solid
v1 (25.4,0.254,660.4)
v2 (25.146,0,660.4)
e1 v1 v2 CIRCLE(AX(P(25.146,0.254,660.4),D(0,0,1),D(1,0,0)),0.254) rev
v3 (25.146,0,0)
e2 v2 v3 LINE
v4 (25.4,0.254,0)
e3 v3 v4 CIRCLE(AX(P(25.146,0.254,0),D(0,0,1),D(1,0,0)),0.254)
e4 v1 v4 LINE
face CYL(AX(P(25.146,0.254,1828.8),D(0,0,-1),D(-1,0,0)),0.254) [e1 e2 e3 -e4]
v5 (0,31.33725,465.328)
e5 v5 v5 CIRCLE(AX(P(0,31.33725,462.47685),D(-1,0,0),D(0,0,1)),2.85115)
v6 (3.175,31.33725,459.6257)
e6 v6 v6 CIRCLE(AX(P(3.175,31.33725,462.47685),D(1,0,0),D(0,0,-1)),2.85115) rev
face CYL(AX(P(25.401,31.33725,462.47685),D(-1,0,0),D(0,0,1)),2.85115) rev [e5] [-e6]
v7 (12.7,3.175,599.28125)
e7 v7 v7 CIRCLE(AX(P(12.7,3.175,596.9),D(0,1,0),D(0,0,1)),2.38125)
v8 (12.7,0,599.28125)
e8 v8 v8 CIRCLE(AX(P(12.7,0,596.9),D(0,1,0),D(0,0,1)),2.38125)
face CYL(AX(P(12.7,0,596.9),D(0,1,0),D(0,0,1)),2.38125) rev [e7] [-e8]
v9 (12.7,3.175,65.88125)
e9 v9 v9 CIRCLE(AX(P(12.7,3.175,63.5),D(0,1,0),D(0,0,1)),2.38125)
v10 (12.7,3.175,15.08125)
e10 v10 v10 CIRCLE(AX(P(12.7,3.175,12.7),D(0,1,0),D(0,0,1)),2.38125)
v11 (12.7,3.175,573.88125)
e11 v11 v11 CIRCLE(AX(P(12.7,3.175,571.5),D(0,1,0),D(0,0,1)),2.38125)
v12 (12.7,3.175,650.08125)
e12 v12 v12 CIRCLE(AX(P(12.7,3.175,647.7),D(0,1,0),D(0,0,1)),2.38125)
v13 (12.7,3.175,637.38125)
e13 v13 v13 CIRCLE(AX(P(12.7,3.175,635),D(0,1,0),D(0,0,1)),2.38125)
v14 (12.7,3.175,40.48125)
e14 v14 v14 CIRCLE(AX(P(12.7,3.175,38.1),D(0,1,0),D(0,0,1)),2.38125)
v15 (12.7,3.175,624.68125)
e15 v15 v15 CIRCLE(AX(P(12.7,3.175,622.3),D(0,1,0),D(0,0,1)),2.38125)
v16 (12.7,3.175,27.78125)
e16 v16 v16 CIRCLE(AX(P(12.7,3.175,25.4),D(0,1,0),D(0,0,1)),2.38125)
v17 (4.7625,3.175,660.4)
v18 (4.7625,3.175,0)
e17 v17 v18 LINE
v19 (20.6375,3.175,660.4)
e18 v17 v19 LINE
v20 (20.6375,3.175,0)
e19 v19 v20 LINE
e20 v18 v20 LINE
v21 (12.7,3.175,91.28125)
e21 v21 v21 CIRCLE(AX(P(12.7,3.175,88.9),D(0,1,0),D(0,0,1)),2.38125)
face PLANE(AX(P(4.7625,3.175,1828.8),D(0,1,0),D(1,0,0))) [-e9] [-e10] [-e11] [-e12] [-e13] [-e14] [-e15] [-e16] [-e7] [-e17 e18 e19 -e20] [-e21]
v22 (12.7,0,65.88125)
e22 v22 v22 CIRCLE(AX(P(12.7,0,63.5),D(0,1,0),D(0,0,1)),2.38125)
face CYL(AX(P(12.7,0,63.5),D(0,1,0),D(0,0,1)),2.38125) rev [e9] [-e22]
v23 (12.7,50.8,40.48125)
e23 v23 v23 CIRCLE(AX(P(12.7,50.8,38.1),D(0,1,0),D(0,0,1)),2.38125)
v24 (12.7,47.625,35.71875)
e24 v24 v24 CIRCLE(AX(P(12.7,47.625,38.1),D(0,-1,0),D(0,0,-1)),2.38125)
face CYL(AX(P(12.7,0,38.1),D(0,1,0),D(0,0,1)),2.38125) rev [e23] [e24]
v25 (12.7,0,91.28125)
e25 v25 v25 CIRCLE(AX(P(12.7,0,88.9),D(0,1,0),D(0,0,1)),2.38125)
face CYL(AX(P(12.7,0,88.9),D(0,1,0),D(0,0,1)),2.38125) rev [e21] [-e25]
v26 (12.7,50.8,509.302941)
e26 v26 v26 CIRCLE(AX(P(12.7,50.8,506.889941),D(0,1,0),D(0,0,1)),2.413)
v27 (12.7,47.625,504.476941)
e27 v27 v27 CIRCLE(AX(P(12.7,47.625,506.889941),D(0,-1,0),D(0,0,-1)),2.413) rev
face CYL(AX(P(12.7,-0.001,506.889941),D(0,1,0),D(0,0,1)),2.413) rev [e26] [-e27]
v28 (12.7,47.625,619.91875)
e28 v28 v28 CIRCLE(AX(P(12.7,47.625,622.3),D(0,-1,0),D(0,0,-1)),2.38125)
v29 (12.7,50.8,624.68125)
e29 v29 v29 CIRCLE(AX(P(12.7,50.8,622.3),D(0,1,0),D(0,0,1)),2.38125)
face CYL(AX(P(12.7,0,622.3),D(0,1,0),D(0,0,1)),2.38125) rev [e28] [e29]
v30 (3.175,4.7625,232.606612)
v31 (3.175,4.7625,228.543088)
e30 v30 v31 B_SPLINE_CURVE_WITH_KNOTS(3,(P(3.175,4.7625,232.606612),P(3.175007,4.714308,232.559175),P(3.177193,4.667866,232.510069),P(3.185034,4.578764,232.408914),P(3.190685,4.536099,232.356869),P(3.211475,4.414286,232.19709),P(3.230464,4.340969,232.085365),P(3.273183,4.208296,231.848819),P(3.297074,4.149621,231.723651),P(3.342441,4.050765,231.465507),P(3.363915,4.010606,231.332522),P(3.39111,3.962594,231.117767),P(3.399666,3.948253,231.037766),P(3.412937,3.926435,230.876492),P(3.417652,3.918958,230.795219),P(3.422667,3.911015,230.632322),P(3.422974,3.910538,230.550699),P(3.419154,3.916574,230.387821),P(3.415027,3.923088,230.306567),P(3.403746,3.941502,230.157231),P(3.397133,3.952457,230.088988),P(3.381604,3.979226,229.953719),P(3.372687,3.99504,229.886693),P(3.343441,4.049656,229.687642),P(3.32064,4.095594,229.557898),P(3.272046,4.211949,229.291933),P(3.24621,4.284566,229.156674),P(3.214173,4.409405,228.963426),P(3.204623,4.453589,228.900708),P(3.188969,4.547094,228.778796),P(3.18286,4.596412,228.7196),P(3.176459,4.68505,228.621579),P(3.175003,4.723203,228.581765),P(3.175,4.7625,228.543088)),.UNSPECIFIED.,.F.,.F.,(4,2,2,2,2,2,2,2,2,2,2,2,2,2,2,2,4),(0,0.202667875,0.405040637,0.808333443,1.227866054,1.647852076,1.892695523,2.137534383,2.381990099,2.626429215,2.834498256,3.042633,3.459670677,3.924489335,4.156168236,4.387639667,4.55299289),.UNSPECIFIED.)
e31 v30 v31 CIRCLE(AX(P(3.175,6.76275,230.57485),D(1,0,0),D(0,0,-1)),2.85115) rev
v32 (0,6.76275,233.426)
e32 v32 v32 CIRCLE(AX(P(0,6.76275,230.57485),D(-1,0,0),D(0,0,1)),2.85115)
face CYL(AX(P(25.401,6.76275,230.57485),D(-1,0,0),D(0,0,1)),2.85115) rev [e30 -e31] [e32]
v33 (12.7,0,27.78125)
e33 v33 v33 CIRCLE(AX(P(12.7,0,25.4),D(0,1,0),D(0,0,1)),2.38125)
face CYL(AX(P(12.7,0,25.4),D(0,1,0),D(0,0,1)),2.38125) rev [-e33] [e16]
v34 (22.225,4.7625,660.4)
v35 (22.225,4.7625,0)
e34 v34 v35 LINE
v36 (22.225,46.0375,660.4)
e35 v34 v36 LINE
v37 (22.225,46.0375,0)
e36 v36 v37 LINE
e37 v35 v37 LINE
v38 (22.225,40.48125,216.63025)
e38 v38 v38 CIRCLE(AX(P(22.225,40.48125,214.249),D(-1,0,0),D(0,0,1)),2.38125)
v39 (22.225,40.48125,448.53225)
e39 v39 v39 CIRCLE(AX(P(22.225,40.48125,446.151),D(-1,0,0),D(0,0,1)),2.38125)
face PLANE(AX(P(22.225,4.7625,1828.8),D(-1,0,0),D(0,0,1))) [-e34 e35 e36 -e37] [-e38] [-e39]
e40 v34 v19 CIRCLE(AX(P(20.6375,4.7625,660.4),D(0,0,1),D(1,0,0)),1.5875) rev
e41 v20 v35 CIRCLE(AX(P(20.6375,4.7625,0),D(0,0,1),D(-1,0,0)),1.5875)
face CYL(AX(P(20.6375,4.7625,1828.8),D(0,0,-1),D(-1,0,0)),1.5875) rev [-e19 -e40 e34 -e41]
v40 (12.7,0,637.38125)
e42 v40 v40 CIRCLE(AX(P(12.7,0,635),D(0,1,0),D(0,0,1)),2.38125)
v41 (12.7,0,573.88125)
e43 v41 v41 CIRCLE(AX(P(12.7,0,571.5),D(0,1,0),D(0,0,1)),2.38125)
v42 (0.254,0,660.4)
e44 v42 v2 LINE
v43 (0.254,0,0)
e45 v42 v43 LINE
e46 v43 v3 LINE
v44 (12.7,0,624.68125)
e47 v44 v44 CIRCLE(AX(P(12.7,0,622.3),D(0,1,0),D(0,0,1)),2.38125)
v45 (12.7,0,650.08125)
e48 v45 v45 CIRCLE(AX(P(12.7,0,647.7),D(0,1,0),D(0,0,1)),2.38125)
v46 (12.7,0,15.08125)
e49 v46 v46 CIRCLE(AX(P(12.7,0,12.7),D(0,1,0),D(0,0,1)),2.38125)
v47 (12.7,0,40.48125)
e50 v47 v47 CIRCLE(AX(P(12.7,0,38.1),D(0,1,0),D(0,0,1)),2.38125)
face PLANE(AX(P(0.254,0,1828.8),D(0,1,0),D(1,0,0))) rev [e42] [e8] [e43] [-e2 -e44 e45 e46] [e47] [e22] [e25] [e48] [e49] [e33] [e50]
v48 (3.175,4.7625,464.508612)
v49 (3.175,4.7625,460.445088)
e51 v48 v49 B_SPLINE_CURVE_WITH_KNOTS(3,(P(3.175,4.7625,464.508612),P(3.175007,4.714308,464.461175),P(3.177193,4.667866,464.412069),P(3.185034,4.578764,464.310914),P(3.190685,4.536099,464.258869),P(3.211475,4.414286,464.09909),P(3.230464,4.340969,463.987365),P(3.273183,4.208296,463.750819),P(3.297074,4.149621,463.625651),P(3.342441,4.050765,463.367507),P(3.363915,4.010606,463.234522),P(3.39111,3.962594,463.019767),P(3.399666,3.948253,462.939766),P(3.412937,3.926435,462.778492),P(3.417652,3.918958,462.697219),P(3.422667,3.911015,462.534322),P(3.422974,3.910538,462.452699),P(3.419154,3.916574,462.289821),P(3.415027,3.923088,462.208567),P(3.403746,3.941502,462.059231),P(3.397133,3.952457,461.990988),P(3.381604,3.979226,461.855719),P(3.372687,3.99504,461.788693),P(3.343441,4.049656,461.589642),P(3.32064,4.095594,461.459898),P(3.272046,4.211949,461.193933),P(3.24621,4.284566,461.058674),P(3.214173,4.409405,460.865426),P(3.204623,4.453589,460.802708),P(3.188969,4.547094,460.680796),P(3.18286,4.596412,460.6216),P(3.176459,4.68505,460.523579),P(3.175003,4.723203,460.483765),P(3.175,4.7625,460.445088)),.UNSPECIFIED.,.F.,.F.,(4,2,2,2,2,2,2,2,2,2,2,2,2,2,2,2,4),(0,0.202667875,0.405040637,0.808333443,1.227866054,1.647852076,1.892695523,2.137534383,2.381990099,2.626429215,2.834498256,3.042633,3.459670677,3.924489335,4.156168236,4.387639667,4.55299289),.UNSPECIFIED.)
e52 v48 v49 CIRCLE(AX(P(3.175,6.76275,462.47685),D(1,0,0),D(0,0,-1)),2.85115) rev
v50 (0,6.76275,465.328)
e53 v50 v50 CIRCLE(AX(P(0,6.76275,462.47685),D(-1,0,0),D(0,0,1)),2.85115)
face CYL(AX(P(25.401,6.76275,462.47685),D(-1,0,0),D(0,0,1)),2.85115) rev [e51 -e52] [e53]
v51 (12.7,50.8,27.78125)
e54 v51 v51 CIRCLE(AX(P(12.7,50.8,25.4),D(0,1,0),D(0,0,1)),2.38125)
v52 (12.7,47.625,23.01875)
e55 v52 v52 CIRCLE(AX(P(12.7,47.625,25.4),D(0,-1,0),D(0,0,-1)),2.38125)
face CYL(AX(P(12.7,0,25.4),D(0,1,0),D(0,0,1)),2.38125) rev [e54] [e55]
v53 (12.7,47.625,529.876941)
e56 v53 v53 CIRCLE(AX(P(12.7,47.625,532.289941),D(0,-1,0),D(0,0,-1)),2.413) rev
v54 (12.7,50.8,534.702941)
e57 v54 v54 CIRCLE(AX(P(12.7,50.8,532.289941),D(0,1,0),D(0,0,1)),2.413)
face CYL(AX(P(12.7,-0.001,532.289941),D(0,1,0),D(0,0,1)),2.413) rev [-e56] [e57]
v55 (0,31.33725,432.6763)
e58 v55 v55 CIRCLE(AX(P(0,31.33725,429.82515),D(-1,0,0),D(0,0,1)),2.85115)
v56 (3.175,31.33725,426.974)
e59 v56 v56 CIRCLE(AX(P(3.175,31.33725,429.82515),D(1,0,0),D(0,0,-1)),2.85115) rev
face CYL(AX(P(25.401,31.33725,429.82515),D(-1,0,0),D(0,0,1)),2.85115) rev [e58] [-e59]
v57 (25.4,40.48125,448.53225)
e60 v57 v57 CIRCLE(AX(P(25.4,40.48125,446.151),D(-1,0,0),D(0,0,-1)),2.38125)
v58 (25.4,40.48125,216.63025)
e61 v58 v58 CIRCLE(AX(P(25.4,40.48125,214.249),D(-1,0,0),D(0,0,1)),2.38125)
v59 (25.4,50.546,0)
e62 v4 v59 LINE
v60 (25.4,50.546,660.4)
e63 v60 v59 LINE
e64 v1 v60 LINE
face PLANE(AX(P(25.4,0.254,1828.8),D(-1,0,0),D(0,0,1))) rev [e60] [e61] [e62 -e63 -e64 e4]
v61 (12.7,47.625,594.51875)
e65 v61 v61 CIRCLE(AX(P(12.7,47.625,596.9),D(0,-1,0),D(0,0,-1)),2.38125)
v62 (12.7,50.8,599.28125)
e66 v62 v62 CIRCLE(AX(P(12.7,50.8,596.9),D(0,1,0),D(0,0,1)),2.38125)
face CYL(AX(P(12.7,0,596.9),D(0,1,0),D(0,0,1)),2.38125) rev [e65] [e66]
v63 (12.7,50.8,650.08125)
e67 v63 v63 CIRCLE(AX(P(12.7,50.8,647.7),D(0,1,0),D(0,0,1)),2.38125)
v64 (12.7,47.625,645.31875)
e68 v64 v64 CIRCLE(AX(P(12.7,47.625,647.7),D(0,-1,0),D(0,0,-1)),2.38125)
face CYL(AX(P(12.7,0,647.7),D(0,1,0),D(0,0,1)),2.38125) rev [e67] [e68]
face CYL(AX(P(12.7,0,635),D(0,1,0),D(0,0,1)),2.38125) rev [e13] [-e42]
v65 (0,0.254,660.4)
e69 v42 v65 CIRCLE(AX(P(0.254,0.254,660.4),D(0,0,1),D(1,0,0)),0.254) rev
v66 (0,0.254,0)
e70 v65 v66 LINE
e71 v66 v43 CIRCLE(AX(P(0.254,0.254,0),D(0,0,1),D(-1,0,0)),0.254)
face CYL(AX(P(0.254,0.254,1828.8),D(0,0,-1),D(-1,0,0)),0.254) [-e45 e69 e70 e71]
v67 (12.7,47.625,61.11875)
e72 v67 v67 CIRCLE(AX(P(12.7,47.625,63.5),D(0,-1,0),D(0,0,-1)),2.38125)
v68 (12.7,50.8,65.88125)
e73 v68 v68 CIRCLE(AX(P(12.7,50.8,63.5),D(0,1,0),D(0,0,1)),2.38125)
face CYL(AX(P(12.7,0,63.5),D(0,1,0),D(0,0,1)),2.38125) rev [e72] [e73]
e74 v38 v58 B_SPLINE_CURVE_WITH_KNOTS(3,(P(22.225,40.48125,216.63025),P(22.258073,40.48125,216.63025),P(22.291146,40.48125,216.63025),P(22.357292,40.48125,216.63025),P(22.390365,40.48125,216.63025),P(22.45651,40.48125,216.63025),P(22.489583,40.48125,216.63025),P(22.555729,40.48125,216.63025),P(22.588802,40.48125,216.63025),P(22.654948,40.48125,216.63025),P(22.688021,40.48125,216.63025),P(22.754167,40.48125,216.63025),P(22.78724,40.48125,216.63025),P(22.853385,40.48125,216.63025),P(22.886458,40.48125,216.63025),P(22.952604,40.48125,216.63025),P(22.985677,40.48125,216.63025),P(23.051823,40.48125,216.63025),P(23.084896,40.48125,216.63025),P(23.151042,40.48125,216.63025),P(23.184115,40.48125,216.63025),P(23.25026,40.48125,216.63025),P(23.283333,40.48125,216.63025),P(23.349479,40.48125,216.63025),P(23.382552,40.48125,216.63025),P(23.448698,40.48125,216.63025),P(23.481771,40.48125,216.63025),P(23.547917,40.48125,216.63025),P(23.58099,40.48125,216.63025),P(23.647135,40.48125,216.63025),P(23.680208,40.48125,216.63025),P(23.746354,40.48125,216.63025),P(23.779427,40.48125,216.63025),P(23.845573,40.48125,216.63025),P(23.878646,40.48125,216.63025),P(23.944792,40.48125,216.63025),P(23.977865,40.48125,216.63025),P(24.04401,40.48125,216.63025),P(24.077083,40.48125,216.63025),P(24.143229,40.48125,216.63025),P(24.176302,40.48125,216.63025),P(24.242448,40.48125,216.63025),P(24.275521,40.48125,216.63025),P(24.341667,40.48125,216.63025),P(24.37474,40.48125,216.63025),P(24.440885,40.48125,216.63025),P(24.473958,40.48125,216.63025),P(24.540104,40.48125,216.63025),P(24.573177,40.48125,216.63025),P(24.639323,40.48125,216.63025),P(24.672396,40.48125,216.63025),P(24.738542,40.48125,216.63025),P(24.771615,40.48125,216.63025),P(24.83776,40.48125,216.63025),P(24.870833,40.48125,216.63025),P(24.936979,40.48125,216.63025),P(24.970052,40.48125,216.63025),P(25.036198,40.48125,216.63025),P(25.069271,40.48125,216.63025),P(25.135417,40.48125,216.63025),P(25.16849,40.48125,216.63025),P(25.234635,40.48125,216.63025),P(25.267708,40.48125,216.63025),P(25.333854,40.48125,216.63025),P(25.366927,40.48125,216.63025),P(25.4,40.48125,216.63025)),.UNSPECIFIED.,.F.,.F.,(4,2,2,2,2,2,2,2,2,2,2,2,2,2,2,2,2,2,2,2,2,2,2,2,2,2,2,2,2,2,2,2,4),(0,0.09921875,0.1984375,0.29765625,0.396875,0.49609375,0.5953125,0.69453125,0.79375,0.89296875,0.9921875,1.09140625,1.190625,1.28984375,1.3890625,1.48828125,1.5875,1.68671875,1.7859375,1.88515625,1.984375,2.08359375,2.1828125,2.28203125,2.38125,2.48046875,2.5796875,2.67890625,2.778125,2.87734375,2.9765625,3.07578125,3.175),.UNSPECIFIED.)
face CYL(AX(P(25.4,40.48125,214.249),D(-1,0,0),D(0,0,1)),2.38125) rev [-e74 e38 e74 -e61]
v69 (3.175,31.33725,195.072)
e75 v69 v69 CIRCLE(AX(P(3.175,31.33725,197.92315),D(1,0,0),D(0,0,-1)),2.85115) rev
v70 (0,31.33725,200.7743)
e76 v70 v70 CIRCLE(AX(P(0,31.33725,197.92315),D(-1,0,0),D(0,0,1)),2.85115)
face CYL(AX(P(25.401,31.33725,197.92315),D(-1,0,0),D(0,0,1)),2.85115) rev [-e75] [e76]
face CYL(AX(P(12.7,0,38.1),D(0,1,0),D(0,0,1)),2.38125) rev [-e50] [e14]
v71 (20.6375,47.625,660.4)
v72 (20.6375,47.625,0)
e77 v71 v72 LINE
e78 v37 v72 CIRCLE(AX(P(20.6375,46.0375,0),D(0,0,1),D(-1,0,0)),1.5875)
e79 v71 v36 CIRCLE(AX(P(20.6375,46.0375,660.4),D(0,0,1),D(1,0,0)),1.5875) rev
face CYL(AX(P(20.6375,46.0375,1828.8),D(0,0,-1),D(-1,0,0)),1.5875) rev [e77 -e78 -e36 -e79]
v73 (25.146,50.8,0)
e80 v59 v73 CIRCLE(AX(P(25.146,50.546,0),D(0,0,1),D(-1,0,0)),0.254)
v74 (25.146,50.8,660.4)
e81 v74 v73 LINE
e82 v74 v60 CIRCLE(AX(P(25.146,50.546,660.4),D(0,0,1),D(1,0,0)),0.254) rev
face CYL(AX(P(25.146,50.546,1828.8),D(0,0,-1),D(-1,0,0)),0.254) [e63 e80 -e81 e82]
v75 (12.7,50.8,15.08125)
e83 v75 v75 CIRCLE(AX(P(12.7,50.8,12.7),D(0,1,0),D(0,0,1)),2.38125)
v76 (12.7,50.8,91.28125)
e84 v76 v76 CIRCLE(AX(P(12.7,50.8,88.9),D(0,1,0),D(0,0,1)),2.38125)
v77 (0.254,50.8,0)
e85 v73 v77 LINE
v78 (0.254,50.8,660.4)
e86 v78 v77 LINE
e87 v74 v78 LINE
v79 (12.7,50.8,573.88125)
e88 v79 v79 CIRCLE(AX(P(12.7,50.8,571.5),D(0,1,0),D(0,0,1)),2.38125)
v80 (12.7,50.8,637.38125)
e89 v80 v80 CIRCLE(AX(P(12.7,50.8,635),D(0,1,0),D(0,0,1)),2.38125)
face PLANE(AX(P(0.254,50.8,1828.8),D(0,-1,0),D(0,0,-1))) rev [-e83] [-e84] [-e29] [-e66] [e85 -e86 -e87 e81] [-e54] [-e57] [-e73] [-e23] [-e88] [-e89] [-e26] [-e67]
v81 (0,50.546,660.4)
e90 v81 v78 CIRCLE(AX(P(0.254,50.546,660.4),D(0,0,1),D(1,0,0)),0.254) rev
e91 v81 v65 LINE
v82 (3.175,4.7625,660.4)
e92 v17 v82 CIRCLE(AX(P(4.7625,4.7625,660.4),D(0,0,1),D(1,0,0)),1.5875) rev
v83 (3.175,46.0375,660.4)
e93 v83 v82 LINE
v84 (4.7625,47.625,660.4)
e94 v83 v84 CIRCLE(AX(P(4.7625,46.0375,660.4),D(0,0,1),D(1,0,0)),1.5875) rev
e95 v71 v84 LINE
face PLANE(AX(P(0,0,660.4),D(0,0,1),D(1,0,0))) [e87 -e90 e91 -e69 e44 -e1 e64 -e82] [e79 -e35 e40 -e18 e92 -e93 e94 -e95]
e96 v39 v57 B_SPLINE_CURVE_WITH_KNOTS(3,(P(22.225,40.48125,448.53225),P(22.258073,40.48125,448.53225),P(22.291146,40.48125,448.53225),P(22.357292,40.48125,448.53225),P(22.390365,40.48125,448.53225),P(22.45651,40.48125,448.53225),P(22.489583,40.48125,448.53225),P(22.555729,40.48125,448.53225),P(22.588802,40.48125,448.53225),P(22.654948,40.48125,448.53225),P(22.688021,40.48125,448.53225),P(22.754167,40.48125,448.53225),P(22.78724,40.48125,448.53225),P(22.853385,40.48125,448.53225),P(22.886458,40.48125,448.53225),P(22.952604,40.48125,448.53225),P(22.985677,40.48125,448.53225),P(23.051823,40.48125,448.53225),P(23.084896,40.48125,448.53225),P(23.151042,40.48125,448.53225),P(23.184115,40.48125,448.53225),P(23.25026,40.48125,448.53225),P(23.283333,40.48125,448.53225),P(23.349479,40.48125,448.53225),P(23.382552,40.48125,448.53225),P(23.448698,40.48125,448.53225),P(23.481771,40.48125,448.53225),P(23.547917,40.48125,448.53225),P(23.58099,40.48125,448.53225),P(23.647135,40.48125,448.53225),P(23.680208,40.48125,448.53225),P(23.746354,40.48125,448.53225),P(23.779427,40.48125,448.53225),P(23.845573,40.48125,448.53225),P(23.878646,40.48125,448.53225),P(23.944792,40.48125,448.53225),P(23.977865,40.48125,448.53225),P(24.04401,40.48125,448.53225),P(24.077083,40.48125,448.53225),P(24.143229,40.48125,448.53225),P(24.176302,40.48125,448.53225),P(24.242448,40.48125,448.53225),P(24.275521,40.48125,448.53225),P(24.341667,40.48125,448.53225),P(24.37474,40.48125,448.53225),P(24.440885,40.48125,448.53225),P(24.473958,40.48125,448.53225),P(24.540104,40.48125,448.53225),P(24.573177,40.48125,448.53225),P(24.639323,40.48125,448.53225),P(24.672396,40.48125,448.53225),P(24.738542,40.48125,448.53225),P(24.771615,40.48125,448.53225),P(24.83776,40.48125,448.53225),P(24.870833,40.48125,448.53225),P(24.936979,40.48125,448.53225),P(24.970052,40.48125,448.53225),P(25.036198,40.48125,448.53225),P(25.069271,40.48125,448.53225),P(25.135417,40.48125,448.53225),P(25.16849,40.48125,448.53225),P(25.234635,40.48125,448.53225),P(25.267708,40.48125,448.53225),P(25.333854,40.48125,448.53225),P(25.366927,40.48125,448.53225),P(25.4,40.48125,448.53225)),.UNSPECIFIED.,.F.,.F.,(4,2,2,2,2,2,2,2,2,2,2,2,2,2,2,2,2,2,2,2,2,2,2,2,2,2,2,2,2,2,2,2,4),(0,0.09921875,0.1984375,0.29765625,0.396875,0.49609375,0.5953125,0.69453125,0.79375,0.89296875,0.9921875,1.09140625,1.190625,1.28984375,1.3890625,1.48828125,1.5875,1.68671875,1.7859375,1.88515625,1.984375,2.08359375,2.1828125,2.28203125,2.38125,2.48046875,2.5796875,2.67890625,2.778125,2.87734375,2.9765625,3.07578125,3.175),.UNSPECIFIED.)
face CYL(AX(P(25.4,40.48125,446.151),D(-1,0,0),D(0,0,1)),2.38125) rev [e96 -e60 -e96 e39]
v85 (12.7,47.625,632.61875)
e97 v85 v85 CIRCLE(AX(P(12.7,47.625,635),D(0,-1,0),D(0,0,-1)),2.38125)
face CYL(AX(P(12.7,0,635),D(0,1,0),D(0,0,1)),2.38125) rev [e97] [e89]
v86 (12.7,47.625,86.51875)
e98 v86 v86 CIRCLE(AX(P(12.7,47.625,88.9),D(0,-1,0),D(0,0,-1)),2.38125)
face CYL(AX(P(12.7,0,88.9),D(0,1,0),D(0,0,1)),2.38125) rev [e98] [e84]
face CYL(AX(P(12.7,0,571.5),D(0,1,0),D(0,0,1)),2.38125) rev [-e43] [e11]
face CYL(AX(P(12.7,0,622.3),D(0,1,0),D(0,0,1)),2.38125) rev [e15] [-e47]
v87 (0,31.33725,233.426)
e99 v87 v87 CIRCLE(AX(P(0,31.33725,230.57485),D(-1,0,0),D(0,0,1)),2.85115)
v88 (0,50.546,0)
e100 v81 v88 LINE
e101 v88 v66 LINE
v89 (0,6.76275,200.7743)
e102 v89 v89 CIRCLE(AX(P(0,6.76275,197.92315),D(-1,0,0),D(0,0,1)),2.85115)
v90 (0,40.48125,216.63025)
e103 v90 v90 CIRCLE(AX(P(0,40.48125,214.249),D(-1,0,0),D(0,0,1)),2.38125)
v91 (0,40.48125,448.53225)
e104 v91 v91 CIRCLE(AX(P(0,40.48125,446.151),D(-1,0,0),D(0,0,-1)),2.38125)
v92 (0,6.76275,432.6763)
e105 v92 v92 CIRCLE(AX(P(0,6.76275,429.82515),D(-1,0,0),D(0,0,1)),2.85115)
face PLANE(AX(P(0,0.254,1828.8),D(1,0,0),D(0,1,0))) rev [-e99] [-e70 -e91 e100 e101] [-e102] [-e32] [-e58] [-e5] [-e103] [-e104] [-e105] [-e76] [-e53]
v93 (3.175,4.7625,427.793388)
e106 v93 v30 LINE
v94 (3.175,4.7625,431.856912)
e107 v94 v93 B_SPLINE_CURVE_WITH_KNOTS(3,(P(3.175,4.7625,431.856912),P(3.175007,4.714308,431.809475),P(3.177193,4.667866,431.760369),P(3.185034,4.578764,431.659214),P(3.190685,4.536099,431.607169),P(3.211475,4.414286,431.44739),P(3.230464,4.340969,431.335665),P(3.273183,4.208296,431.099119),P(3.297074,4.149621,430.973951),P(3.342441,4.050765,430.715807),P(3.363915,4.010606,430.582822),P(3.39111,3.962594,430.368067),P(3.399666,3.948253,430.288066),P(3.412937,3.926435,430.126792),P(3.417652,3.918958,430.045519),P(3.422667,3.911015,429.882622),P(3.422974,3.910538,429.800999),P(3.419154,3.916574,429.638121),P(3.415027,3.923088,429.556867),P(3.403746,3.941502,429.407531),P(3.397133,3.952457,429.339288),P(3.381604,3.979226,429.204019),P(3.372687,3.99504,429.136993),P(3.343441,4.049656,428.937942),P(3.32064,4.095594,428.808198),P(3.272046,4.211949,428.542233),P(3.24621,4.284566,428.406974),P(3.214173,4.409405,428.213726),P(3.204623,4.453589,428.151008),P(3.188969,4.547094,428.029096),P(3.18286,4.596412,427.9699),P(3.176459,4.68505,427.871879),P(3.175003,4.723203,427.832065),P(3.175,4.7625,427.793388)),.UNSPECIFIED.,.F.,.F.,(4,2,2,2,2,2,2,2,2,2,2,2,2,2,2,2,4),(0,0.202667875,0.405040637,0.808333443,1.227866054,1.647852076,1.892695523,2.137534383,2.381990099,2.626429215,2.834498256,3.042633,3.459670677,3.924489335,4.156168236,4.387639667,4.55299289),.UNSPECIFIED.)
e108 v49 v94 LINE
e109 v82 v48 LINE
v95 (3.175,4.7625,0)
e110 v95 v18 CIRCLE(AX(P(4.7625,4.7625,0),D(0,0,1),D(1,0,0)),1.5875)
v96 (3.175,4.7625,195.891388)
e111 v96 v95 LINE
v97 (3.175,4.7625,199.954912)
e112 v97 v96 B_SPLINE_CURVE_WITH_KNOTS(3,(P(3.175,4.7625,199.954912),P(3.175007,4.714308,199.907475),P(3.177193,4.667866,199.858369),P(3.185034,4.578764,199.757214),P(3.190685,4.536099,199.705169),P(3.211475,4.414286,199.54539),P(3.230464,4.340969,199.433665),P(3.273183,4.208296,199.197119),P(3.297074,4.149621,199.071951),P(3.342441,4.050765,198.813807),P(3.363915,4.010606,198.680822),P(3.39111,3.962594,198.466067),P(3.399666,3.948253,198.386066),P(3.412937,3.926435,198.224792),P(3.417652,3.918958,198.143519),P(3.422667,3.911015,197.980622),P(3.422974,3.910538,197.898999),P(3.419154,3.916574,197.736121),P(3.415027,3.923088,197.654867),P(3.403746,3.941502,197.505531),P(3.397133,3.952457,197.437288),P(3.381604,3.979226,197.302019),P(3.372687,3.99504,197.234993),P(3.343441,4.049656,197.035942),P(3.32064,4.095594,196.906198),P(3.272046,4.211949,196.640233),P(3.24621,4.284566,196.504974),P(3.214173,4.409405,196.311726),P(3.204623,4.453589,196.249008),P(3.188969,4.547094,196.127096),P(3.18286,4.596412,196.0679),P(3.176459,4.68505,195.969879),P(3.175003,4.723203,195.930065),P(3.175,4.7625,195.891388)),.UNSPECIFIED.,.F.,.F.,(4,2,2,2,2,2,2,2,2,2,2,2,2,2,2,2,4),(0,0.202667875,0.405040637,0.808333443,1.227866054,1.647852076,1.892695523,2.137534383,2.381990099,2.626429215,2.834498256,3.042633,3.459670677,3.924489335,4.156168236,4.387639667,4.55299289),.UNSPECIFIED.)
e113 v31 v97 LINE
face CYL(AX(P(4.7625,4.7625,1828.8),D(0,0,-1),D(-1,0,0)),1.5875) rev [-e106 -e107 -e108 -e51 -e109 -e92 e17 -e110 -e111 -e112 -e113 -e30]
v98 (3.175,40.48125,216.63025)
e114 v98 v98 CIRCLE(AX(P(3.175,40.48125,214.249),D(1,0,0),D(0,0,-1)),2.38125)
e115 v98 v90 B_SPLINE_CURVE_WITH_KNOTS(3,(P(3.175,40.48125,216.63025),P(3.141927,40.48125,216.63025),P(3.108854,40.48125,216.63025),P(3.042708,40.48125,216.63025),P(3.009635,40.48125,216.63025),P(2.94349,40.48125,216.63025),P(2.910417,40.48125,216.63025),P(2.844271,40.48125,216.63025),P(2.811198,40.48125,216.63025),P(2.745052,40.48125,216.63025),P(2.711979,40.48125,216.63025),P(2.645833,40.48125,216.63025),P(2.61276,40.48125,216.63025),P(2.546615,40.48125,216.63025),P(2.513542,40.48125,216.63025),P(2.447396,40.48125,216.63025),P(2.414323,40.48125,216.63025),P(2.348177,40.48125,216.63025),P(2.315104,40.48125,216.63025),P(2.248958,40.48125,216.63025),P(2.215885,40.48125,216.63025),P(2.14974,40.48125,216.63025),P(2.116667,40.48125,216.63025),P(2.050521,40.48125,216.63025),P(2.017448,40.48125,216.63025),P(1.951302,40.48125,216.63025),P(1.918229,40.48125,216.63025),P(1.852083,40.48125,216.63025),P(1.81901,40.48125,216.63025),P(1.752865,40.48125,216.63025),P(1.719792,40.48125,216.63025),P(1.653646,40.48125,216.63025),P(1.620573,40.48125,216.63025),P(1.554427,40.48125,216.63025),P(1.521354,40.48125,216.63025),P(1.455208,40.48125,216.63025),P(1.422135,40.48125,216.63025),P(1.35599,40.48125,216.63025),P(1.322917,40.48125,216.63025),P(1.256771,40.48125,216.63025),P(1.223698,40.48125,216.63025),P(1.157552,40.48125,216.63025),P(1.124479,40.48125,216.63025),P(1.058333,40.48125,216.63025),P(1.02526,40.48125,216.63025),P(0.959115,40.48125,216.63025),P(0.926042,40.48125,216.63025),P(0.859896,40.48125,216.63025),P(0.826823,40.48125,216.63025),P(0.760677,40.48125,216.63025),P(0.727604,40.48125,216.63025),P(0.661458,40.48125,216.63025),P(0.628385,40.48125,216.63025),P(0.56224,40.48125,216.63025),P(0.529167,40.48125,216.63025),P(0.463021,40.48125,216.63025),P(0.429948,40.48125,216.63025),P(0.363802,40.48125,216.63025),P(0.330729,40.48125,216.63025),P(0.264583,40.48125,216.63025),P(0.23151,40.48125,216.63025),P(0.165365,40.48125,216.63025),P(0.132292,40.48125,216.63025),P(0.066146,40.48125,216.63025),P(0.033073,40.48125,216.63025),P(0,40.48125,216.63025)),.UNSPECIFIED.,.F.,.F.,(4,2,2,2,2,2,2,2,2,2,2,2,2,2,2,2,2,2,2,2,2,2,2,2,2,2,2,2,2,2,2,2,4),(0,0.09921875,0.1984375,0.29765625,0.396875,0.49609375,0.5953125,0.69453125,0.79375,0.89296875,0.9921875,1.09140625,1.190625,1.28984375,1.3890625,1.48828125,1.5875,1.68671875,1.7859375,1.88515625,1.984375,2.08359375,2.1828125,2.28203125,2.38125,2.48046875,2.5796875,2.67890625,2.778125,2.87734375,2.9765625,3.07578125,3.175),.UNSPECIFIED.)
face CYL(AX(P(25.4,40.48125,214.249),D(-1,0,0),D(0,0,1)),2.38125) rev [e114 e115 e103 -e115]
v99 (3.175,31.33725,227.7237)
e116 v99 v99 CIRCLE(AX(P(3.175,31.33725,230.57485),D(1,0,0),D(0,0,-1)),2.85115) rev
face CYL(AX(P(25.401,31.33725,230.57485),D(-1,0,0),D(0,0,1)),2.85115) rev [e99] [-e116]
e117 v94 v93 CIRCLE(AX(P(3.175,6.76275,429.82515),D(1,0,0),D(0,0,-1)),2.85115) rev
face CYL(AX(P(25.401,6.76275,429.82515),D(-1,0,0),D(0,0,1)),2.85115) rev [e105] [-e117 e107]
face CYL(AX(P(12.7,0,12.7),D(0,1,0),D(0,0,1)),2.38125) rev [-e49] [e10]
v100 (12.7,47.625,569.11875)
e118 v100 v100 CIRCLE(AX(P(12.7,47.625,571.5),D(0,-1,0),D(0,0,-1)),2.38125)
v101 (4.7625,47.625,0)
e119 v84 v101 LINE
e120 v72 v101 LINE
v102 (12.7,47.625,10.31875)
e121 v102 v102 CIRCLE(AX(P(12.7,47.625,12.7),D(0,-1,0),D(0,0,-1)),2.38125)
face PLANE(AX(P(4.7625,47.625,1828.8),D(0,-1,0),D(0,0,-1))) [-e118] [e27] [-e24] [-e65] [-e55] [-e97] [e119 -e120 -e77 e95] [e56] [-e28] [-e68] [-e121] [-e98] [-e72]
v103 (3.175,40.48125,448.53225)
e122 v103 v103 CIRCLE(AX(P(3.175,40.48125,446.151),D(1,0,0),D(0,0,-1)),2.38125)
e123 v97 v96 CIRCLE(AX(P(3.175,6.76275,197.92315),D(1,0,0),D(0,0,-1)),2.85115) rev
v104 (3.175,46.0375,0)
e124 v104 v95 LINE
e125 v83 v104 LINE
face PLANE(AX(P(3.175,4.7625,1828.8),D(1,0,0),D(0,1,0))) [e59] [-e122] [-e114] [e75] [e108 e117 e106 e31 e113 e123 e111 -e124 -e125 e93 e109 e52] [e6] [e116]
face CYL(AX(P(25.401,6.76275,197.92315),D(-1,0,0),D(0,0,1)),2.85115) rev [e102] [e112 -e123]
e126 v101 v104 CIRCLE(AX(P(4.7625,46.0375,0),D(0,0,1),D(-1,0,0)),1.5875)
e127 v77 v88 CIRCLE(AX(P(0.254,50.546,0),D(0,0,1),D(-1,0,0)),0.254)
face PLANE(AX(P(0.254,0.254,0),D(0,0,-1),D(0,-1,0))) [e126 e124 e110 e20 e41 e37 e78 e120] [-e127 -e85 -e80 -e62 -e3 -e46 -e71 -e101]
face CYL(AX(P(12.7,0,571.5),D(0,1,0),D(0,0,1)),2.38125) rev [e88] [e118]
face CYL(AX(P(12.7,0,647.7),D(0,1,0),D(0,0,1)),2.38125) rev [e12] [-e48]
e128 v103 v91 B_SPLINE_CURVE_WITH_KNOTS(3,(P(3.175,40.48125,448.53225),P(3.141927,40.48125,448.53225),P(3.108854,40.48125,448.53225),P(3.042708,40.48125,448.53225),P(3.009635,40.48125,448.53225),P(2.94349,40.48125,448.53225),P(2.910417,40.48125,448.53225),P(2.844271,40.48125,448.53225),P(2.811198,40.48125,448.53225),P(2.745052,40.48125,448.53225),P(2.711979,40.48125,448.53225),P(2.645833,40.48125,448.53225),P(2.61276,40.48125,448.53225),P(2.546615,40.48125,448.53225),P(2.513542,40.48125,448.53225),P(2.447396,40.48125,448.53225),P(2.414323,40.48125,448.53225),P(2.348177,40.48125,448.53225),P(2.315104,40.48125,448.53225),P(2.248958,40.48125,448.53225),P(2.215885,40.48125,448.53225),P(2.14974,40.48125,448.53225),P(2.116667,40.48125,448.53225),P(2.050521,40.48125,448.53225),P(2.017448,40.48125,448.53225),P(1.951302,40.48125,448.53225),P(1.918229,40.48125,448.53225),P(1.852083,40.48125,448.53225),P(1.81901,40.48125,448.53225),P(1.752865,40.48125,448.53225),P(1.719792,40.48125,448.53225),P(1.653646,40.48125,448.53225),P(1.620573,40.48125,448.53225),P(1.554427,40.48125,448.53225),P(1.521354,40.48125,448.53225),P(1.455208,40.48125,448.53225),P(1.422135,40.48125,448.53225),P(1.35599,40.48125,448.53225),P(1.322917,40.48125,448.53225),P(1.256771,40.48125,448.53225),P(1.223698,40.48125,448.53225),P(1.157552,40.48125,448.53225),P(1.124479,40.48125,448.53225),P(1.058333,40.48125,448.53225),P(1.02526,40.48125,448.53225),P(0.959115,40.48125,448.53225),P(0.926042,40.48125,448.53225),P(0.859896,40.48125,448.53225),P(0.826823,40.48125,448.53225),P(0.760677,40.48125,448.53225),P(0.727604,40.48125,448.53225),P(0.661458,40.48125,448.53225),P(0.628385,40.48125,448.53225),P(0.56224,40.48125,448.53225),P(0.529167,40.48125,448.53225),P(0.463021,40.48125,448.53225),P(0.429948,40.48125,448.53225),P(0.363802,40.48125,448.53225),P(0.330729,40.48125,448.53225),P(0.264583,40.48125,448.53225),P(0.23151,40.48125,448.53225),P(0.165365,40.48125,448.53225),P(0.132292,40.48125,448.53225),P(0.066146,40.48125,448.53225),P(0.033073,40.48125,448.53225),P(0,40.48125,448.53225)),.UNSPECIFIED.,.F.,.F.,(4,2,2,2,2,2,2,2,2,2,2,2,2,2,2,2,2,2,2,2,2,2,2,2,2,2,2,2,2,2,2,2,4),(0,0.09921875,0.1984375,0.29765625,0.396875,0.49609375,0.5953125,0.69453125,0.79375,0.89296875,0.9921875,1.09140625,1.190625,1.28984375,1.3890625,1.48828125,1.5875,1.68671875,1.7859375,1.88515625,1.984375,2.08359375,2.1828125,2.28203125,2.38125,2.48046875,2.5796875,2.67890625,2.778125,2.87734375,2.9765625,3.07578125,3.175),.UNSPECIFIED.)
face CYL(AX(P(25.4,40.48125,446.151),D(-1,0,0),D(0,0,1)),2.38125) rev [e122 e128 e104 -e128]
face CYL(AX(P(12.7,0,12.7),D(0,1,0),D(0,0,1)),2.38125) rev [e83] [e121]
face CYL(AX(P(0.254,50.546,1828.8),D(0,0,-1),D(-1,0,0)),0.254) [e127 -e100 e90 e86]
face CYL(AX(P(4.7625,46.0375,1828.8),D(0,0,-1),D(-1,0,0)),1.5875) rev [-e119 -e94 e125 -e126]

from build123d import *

# Parameters (mm, degrees)
CUT_EXTRUDE1_START = -1828.8
CUT_EXTRUDE1_DEPTH = 660.4
SKETCH3_R          = 2.38125
CUT_EXTRUDE3_DEPTH = 50.8
CUT_EXTRUDE4_REACH = 664.838
SKETCH4_R          = 2.413
CUT_EXTRUDE5_REACH = 664.838
SKETCH5_R          = 2.85115
SKETCH6_R          = 2.38125
CUT_EXTRUDE6_DEPTH = 663.837808315


with BuildPart() as part:
    # Cut-Extrude1: read off the stored shape, not the designer's step
    # Cut-Extrude1 outline → Cut-Extrude1 (new body)
    with BuildSketch(Plane.XY.offset(1828.8).offset(CUT_EXTRUDE1_START)):
        with BuildLine():
            Line((0, 50.546), (0, 0.254))
            ThreePointArc((0, 0.254), (0.074394878, 0.074394878), (0.254, 0))
            Line((0.254, 0), (25.146, 0))
            ThreePointArc((25.146, 0), (25.325605122, 0.074394878), (25.4, 0.254))
            Line((25.4, 0.254), (25.4, 50.546))
            ThreePointArc((25.4, 50.546), (25.325605122, 50.725605122), (25.146, 50.8))
            Line((25.146, 50.8), (0.254, 50.8))
            ThreePointArc((0.254, 50.8), (0.074394878, 50.725605122), (0, 50.546))
        make_face()
        with BuildLine():
            ThreePointArc((4.7625, 3.175), (3.639967985, 3.639967985), (3.175, 4.7625))
            Line((3.175, 4.7625), (3.175, 46.0375))
            ThreePointArc((3.175, 46.0375), (3.639967985, 47.160032015), (4.7625, 47.625))
            Line((4.7625, 47.625), (20.6375, 47.625))
            ThreePointArc((20.6375, 47.625), (21.760032015, 47.160032015), (22.225, 46.0375))
            Line((22.225, 46.0375), (22.225, 4.7625))
            ThreePointArc((22.225, 4.7625), (21.760032015, 3.639967985), (20.6375, 3.175))
            Line((20.6375, 3.175), (4.7625, 3.175))
        make_face(mode=Mode.SUBTRACT)
    extrude(amount=CUT_EXTRUDE1_DEPTH)

    # Sketch3 → Cut-Extrude3 (cut)
    with BuildSketch(Plane(origin=(0, 50.8, 0), x_dir=(1, 0, 0), z_dir=(0, 1, 0))):
        with Locations(Location((12.7, -25.4, 0), (0, 0, 270))):
            Circle(SKETCH3_R)
        with Locations(Location((12.7, -12.7, 0), (0, 0, 270))):
            Circle(SKETCH3_R)
        with Locations(Location((12.7, -38.1, 0), (0, 0, 270))):
            Circle(SKETCH3_R)
        with Locations(Location((12.7, -622.3, 0), (0, 0, 270))):
            Circle(SKETCH3_R)
        with Locations(Location((12.7, -635, 0), (0, 0, 270))):
            Circle(SKETCH3_R)
        with Locations(Location((12.7, -647.7, 0), (0, 0, 270))):
            Circle(SKETCH3_R)
        with Locations(Location((12.7, -63.5, 0), (0, 0, 270))):
            Circle(SKETCH3_R)
        with Locations(Location((12.7, -88.9, 0), (0, 0, 270))):
            Circle(SKETCH3_R)
        with Locations(Location((12.7, -596.9, 0), (0, 0, 270))):
            Circle(SKETCH3_R)
        with Locations(Location((12.7, -571.5, 0), (0, 0, 270))):
            Circle(SKETCH3_R)
    extrude(amount=-CUT_EXTRUDE3_DEPTH, mode=Mode.SUBTRACT)

    # Sketch4 → Cut-Extrude4 (cut, up to next)
    with BuildSketch(Plane(origin=(0, 50.8, 0), x_dir=(1, 0, 0), z_dir=(0, 1, 0)), mode=Mode.PRIVATE) as cut_extrude4_sk1:
        with Locations(Location((12.7, -532.289940881, 0), (0, 0, 270))):
            Circle(SKETCH4_R)
    cut_extrude4_tool1 = extrude(cut_extrude4_sk1.sketch, amount=-CUT_EXTRUDE4_REACH, mode=Mode.PRIVATE) & part.part
    # Sketch4 → Cut-Extrude4 (cut, up to next)
    with BuildSketch(Plane(origin=(0, 50.8, 0), x_dir=(1, 0, 0), z_dir=(0, 1, 0)), mode=Mode.PRIVATE) as cut_extrude4_sk2:
        with Locations(Location((12.7, -506.889940881, 0), (0, 0, 270))):
            Circle(SKETCH4_R)
    cut_extrude4_tool2 = extrude(cut_extrude4_sk2.sketch, amount=-CUT_EXTRUDE4_REACH, mode=Mode.PRIVATE) & part.part
    add(cut_extrude4_tool1.solids().sort_by_distance((12.7, 50.8, 532.289941))[0], mode=Mode.SUBTRACT)
    add(cut_extrude4_tool2.solids().sort_by_distance((12.7, 50.8, 506.889941))[0], mode=Mode.SUBTRACT)

    # Sketch5 → Cut-Extrude5 (cut, up to next)
    with BuildSketch(Plane.ZY, mode=Mode.PRIVATE) as cut_extrude5_sk1:
        with Locations((197.92315, 31.33725)):
            Circle(SKETCH5_R)
    cut_extrude5_tool1 = extrude(cut_extrude5_sk1.sketch, amount=-CUT_EXTRUDE5_REACH, mode=Mode.PRIVATE) & part.part
    # Sketch5 → Cut-Extrude5 (cut, up to next)
    with BuildSketch(Plane.ZY, mode=Mode.PRIVATE) as cut_extrude5_sk2:
        with Locations((230.57485, 31.33725)):
            Circle(SKETCH5_R)
    cut_extrude5_tool2 = extrude(cut_extrude5_sk2.sketch, amount=-CUT_EXTRUDE5_REACH, mode=Mode.PRIVATE) & part.part
    # Sketch5 → Cut-Extrude5 (cut, up to next)
    with BuildSketch(Plane.ZY, mode=Mode.PRIVATE) as cut_extrude5_sk3:
        with Locations((230.57485, 6.76275)):
            Circle(SKETCH5_R)
    cut_extrude5_tool3 = extrude(cut_extrude5_sk3.sketch, amount=-CUT_EXTRUDE5_REACH, mode=Mode.PRIVATE) & part.part
    # Sketch5 → Cut-Extrude5 (cut, up to next)
    with BuildSketch(Plane.ZY, mode=Mode.PRIVATE) as cut_extrude5_sk4:
        with Locations((197.92315, 6.76275)):
            Circle(SKETCH5_R)
    cut_extrude5_tool4 = extrude(cut_extrude5_sk4.sketch, amount=-CUT_EXTRUDE5_REACH, mode=Mode.PRIVATE) & part.part
    # Sketch5 → Cut-Extrude5 (cut, up to next)
    with BuildSketch(Plane.ZY, mode=Mode.PRIVATE) as cut_extrude5_sk5:
        with Locations((429.82515, 31.33725)):
            Circle(SKETCH5_R)
    cut_extrude5_tool5 = extrude(cut_extrude5_sk5.sketch, amount=-CUT_EXTRUDE5_REACH, mode=Mode.PRIVATE) & part.part
    # Sketch5 → Cut-Extrude5 (cut, up to next)
    with BuildSketch(Plane.ZY, mode=Mode.PRIVATE) as cut_extrude5_sk6:
        with Locations((462.47685, 31.33725)):
            Circle(SKETCH5_R)
    cut_extrude5_tool6 = extrude(cut_extrude5_sk6.sketch, amount=-CUT_EXTRUDE5_REACH, mode=Mode.PRIVATE) & part.part
    # Sketch5 → Cut-Extrude5 (cut, up to next)
    with BuildSketch(Plane.ZY, mode=Mode.PRIVATE) as cut_extrude5_sk7:
        with Locations((462.47685, 6.76275)):
            Circle(SKETCH5_R)
    cut_extrude5_tool7 = extrude(cut_extrude5_sk7.sketch, amount=-CUT_EXTRUDE5_REACH, mode=Mode.PRIVATE) & part.part
    # Sketch5 → Cut-Extrude5 (cut, up to next)
    with BuildSketch(Plane.ZY, mode=Mode.PRIVATE) as cut_extrude5_sk8:
        with Locations((429.82515, 6.76275)):
            Circle(SKETCH5_R)
    cut_extrude5_tool8 = extrude(cut_extrude5_sk8.sketch, amount=-CUT_EXTRUDE5_REACH, mode=Mode.PRIVATE) & part.part
    add(cut_extrude5_tool1.solids().sort_by_distance((0, 31.33725, 197.92315))[0], mode=Mode.SUBTRACT)
    add(cut_extrude5_tool2.solids().sort_by_distance((0, 31.33725, 230.57485))[0], mode=Mode.SUBTRACT)
    add(cut_extrude5_tool3.solids().sort_by_distance((0, 6.76275, 230.57485))[0], mode=Mode.SUBTRACT)
    add(cut_extrude5_tool4.solids().sort_by_distance((0, 6.76275, 197.92315))[0], mode=Mode.SUBTRACT)
    add(cut_extrude5_tool5.solids().sort_by_distance((0, 31.33725, 429.82515))[0], mode=Mode.SUBTRACT)
    add(cut_extrude5_tool6.solids().sort_by_distance((0, 31.33725, 462.47685))[0], mode=Mode.SUBTRACT)
    add(cut_extrude5_tool7.solids().sort_by_distance((0, 6.76275, 462.47685))[0], mode=Mode.SUBTRACT)
    add(cut_extrude5_tool8.solids().sort_by_distance((0, 6.76275, 429.82515))[0], mode=Mode.SUBTRACT)

    # Sketch6 → Cut-Extrude6 (cut, through all)
    with BuildSketch(Plane.ZY):
        with Locations((214.249, 40.48125)):
            Circle(SKETCH6_R)
        with Locations((446.151, 40.48125)):
            Circle(SKETCH6_R)
    extrude(amount=-CUT_EXTRUDE6_DEPTH, mode=Mode.SUBTRACT)


solid = part.part
